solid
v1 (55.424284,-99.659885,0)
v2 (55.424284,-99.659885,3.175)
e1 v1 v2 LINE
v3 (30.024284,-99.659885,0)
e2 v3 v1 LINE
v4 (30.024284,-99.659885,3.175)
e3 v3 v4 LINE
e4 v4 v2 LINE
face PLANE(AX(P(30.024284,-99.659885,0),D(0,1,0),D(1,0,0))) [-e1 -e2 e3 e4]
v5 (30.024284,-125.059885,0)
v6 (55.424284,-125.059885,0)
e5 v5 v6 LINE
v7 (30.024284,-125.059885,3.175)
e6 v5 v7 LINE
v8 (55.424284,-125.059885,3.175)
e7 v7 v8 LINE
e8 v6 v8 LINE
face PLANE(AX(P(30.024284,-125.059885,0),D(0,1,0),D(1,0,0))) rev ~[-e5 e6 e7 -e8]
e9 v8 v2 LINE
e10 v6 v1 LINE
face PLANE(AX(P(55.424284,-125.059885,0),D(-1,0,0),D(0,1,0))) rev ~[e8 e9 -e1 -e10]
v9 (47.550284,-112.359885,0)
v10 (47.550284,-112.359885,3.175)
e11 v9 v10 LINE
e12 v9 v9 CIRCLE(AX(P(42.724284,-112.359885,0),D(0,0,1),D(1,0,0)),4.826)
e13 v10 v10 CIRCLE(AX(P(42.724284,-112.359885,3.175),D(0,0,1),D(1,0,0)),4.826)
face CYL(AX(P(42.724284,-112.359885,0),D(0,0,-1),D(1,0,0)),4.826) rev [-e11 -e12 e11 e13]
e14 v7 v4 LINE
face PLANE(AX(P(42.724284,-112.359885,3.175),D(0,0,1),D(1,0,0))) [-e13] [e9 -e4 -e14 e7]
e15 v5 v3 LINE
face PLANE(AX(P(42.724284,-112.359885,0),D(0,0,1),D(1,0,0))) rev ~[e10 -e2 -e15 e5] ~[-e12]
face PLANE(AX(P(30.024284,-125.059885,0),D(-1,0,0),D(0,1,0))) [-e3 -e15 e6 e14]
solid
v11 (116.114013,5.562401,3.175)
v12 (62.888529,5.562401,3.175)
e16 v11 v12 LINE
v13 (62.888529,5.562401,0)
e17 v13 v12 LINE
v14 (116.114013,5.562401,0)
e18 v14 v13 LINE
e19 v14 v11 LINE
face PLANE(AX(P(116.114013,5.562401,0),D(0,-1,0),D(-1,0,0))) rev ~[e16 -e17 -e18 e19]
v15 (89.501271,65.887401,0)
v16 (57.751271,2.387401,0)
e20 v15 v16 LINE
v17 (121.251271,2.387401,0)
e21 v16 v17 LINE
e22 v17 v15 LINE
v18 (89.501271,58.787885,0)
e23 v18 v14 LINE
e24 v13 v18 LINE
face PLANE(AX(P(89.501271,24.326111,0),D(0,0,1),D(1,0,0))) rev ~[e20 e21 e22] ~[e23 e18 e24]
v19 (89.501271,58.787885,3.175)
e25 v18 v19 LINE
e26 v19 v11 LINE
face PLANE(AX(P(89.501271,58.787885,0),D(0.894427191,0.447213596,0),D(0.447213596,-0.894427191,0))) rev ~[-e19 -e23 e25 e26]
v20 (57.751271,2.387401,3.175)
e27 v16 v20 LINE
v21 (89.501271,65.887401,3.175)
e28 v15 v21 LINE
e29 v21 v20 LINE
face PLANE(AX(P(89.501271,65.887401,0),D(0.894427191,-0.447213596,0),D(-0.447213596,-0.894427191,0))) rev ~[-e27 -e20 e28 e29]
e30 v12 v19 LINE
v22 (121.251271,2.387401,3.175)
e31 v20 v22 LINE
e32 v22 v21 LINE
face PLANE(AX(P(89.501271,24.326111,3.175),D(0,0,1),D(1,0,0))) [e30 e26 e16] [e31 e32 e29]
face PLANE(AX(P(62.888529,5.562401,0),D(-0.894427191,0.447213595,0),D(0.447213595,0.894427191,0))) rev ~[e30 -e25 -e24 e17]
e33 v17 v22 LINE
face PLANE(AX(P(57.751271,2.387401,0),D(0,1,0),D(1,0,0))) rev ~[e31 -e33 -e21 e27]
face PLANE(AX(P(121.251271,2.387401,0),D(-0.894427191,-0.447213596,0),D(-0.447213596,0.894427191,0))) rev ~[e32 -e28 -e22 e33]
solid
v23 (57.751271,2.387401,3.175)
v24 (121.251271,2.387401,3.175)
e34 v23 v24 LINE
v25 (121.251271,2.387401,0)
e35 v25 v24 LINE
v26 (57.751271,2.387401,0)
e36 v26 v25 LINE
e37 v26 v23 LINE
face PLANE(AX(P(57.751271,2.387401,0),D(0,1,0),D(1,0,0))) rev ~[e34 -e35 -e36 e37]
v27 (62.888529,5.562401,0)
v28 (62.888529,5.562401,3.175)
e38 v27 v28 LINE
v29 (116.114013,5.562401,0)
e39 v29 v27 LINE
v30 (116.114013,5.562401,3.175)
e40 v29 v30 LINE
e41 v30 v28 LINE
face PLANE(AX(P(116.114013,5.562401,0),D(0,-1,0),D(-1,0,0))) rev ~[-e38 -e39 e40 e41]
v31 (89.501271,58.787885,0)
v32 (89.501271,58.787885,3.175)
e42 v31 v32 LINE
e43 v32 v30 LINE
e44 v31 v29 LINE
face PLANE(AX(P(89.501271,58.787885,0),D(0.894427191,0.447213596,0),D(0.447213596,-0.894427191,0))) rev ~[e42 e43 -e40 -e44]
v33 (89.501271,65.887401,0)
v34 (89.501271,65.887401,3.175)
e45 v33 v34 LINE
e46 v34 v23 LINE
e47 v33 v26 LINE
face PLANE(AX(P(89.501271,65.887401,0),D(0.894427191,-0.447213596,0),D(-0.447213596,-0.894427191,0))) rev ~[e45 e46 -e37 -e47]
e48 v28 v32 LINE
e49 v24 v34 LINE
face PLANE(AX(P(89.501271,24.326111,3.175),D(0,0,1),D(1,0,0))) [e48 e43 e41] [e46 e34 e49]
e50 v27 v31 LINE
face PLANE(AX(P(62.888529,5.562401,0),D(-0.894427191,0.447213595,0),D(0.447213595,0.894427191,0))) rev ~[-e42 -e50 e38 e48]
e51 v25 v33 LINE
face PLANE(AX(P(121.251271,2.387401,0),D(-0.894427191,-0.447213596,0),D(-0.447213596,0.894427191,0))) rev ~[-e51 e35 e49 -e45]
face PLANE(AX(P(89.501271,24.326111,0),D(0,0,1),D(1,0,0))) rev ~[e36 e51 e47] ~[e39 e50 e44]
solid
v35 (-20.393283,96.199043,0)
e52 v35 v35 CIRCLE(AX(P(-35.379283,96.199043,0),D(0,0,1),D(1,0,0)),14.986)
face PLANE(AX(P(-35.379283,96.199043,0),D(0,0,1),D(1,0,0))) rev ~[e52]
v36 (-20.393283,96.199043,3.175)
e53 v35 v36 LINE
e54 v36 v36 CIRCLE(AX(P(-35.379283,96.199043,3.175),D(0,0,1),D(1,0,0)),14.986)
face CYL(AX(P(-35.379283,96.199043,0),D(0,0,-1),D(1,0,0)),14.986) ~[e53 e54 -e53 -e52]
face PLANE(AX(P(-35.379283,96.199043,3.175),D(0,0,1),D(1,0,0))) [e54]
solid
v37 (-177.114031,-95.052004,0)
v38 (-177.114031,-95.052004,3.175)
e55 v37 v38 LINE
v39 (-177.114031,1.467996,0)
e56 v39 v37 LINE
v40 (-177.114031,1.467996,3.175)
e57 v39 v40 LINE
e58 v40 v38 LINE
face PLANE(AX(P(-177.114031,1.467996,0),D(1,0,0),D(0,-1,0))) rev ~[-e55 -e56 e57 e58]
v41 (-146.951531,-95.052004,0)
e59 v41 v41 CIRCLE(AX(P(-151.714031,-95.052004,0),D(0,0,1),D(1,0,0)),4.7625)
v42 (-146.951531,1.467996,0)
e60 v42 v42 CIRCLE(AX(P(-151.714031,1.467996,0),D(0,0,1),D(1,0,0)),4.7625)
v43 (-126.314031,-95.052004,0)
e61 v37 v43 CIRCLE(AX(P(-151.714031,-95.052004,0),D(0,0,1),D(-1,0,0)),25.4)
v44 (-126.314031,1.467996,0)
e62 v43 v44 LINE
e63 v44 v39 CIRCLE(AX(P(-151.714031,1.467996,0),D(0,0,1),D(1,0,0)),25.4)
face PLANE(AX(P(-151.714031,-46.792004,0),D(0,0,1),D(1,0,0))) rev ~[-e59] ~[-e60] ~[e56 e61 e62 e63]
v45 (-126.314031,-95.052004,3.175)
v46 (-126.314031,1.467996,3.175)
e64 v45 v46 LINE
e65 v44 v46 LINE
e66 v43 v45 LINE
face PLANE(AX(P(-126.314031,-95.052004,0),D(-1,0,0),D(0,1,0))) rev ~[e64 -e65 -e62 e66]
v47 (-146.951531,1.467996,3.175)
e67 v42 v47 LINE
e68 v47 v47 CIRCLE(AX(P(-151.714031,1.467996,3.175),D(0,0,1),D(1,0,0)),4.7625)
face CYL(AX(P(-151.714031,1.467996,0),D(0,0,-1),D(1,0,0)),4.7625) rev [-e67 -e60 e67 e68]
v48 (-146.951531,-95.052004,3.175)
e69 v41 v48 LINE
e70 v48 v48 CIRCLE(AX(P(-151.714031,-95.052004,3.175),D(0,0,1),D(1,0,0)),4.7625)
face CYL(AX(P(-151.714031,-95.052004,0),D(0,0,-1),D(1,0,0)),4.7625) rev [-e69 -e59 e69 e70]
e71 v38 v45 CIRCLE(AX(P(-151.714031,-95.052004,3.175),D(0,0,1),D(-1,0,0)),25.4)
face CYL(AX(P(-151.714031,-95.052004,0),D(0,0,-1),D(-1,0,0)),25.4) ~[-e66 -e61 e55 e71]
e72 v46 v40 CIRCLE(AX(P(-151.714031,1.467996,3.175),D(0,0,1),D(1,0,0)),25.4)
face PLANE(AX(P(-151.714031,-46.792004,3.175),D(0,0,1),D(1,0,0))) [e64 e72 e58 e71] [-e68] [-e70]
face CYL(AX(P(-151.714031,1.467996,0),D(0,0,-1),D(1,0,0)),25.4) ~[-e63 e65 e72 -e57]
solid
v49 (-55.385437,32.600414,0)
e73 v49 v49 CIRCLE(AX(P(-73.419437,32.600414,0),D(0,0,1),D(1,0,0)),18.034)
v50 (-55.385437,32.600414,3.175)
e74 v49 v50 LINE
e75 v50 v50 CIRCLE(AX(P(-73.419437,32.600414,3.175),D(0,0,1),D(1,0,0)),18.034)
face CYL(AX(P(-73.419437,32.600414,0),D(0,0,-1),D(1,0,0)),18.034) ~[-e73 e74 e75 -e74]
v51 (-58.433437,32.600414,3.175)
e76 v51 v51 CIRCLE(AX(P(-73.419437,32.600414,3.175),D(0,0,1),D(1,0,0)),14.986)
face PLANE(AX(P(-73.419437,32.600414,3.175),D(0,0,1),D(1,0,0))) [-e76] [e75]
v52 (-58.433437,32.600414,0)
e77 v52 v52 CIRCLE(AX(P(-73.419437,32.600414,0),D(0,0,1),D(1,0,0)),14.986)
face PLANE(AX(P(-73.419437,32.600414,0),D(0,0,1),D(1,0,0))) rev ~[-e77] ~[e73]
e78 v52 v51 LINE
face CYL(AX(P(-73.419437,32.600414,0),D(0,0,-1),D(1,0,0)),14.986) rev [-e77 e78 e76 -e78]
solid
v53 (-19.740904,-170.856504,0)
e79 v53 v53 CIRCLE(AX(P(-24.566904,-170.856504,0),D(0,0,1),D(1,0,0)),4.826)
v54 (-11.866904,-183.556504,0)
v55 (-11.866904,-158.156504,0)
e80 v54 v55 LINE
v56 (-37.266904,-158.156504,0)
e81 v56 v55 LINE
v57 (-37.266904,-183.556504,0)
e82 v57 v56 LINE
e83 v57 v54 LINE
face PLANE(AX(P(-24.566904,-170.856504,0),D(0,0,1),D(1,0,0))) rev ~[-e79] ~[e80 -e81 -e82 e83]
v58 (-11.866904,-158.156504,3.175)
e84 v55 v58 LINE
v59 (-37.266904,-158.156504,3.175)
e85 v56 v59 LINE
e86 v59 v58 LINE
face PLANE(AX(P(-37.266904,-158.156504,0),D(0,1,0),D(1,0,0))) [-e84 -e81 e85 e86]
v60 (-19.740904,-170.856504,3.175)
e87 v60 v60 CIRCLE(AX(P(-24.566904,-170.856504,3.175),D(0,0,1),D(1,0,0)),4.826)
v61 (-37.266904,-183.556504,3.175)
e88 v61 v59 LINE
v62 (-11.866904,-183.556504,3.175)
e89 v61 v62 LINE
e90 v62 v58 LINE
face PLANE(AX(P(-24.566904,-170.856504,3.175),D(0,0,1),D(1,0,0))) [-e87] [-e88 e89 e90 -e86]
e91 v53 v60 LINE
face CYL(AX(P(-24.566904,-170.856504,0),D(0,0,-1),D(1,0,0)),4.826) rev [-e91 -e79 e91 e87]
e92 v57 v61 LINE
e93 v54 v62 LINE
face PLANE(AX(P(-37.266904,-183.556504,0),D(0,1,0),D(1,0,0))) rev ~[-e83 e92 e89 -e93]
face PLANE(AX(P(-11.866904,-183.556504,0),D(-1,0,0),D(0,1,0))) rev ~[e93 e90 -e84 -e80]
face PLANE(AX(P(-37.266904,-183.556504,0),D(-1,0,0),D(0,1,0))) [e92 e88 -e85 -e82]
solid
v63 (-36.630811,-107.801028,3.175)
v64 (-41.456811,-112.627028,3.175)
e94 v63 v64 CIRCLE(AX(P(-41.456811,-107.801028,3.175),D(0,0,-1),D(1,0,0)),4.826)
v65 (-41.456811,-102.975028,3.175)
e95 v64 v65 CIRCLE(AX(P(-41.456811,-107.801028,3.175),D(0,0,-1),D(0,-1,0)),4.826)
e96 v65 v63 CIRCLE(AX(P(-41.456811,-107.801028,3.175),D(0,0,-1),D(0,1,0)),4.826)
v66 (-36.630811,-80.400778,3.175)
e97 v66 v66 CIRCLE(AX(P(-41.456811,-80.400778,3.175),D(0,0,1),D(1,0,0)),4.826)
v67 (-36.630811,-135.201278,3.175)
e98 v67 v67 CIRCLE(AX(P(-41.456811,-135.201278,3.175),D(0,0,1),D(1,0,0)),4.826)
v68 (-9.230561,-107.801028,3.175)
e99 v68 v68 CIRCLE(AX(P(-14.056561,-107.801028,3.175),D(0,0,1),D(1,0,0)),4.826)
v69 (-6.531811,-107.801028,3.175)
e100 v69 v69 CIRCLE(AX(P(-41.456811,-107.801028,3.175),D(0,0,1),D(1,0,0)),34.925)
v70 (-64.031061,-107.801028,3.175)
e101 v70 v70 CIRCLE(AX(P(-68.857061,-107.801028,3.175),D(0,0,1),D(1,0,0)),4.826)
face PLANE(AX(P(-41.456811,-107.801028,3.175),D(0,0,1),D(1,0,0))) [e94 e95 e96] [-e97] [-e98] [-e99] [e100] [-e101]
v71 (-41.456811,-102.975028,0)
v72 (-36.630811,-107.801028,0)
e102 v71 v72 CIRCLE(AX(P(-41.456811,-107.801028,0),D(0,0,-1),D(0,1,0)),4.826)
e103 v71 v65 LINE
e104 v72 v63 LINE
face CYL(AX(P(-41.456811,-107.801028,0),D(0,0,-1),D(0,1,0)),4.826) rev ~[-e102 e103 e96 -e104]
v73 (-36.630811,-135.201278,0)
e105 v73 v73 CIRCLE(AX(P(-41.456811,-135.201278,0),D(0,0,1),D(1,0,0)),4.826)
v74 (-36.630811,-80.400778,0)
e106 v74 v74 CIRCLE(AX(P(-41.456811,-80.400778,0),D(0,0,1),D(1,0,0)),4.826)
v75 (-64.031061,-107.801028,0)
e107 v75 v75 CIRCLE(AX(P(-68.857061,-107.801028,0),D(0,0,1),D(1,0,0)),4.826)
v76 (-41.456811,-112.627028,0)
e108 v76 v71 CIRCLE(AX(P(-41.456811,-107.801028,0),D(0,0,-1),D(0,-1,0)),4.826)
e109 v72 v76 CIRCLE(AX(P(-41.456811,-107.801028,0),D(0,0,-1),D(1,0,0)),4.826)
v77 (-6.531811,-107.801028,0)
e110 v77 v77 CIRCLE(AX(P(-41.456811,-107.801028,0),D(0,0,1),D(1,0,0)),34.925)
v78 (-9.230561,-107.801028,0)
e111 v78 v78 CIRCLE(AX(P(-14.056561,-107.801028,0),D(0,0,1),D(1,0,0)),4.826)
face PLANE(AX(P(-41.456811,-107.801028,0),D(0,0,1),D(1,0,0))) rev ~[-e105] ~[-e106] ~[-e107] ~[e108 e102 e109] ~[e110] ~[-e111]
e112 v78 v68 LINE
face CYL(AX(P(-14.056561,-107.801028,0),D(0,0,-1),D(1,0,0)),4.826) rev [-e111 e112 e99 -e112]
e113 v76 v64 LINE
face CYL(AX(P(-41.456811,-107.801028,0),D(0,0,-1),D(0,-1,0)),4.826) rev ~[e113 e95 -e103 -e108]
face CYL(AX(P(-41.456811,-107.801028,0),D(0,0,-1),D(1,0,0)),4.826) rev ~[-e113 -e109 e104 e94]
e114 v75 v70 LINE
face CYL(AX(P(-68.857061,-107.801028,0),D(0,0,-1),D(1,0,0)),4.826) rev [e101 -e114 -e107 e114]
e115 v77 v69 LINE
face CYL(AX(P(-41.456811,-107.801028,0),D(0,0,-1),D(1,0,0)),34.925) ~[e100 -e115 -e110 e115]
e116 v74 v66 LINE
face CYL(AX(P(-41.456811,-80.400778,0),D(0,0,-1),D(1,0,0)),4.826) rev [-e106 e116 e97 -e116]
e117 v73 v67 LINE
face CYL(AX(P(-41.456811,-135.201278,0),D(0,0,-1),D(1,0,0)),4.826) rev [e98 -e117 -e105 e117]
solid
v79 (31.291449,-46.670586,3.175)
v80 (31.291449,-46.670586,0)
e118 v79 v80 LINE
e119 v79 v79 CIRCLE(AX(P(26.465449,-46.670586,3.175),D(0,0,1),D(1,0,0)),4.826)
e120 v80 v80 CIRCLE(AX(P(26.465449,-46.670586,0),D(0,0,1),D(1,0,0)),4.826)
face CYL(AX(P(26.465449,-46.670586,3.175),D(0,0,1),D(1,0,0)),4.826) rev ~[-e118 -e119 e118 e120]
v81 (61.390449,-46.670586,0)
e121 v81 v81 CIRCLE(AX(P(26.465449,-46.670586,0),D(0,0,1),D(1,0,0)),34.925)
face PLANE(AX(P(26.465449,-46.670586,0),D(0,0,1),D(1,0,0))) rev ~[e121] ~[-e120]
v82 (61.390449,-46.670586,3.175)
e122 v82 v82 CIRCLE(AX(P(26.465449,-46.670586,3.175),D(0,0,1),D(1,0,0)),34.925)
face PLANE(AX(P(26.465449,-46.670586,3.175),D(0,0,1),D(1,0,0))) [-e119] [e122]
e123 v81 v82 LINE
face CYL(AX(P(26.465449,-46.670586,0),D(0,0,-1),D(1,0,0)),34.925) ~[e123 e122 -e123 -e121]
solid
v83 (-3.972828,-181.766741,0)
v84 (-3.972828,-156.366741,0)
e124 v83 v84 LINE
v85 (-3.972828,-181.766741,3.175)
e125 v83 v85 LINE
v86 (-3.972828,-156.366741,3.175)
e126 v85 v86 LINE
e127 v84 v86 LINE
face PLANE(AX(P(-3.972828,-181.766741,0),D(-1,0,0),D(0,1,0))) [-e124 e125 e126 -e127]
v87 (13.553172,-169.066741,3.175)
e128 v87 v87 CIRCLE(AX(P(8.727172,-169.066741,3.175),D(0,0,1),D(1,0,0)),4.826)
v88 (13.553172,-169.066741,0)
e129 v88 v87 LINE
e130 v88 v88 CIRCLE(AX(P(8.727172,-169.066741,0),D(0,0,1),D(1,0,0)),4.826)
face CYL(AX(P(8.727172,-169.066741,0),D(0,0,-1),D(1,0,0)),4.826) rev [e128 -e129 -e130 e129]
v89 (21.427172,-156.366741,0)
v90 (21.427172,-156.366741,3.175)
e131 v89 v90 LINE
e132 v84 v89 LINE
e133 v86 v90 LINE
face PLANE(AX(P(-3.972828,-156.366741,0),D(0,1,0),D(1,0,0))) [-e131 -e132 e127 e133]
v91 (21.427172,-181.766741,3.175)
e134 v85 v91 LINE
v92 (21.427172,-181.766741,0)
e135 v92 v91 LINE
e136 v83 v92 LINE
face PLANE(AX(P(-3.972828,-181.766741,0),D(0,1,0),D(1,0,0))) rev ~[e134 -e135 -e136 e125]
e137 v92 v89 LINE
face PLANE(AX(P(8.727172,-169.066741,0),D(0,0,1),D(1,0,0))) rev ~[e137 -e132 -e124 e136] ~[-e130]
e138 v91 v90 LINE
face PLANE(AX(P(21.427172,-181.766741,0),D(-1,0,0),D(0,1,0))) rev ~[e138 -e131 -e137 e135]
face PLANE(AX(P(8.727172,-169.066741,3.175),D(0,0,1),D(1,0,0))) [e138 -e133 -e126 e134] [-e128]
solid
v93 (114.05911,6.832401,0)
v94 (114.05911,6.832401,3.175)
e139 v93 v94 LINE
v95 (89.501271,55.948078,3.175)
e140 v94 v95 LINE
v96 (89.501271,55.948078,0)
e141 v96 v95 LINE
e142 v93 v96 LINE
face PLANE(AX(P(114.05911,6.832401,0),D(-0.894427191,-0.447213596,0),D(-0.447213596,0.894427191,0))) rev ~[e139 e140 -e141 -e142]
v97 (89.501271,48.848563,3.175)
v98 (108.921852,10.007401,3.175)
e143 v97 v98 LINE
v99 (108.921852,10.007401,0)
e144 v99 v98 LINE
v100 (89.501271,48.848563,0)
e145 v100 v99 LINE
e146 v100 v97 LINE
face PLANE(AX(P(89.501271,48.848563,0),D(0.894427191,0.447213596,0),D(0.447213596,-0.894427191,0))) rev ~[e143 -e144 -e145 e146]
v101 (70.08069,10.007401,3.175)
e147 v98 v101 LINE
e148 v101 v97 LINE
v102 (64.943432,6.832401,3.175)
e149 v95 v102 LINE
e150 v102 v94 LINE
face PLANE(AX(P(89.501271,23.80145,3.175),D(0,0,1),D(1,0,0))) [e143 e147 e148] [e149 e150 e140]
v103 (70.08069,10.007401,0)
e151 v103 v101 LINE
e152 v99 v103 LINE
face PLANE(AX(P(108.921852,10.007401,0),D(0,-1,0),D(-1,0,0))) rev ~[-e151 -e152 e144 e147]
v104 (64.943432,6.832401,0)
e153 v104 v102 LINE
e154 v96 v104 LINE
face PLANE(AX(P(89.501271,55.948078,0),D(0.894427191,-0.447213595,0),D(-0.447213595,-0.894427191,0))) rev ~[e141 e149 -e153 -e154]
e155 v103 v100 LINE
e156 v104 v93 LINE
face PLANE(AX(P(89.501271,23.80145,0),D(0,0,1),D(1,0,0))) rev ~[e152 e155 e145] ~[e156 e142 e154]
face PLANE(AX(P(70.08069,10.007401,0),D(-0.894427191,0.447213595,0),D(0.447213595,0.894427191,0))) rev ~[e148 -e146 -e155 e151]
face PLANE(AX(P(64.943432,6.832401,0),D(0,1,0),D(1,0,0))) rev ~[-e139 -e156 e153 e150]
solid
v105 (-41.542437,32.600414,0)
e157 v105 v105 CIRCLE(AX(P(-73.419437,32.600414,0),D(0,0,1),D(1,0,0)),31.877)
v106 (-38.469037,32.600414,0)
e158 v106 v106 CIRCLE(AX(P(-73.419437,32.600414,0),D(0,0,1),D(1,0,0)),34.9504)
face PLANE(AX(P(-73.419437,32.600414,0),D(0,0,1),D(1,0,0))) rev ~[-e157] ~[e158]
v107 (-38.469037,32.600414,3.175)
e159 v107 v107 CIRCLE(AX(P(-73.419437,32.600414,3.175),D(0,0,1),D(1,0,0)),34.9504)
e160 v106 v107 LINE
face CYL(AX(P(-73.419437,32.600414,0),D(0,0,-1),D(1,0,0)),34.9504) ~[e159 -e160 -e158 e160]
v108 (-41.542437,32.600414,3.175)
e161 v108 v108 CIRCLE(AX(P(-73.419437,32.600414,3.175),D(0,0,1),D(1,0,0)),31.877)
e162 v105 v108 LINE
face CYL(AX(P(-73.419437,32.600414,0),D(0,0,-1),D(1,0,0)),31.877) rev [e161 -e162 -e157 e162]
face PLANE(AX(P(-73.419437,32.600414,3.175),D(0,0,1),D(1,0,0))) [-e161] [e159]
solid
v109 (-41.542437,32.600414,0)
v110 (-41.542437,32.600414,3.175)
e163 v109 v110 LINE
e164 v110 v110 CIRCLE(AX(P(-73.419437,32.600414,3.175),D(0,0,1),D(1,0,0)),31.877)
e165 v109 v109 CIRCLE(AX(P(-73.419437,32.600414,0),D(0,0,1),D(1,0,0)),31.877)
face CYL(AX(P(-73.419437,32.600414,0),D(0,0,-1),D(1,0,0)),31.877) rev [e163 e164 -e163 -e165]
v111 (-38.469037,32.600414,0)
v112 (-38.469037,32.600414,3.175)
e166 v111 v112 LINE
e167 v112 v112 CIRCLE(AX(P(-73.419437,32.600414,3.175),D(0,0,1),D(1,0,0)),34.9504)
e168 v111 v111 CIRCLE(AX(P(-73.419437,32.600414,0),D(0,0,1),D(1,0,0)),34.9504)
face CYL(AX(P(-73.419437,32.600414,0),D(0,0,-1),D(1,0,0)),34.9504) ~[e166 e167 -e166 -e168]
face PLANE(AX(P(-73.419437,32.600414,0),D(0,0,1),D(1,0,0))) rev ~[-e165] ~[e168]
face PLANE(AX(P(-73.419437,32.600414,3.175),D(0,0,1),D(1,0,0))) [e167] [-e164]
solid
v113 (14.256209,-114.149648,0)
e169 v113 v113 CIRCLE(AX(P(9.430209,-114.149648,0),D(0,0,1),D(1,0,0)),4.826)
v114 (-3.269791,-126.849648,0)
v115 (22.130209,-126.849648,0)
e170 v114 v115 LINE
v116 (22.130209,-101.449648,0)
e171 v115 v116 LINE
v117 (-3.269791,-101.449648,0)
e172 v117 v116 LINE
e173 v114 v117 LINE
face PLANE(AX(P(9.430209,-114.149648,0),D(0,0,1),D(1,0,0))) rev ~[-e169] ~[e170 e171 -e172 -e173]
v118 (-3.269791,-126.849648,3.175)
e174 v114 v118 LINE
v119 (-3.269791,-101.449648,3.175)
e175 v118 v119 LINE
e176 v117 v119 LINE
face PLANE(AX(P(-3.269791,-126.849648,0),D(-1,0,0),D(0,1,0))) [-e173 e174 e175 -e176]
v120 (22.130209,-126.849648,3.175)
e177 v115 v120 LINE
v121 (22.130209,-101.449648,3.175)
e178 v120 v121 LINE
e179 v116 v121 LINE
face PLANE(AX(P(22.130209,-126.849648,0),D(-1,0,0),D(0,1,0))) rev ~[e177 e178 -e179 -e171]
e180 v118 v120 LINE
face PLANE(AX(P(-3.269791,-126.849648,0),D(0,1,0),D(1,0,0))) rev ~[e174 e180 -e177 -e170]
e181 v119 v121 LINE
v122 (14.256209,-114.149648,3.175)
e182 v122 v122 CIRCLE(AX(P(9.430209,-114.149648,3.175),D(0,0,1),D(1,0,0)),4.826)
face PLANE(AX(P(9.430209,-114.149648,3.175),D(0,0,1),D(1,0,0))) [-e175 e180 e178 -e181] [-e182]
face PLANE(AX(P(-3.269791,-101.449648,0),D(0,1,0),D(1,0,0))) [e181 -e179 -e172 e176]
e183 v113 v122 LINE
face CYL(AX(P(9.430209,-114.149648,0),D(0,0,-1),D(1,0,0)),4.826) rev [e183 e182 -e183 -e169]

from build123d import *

# Parameters (mm, degrees)
F1_R      = 34.925
F1_R_2    = 4.826
F2_DEPTH  = 3.175
F3_R      = 34.925
F4_DEPTH  = 3.175
F5_R      = 4.826
F6_DEPTH  = 25.4
F7_W      = 25.4
F7_H      = 25.4
F7_R      = 4.826
F8_DEPTH  = 3.175
F0_R      = 18.034
F0_R_2    = 14.986
F9_DEPTH  = 3.175
F0_R_3    = 34.9504
F0_R_4    = 31.877
F10_R     = 4.7625
F11_DEPTH = 3.175
F12_DEPTH = 3.175
F13_DEPTH = 3.175


# Not quite as in the source:
# - a feature names something its author has since deleted; it is built from what else it names


with BuildPart() as f2:
    # F1 (on Top) → F2 (new body)
    with BuildSketch(Plane.XY):
        with Locations((-41.45681113, -107.801027596)):
            Circle(F1_R)
        with Locations((-41.45681113, -135.201277596)):
            Circle(F1_R_2, mode=Mode.SUBTRACT)
        with Locations((-68.85706113, -107.801027596)):
            Circle(F1_R_2, mode=Mode.SUBTRACT)
        with BuildLine():
            ThreePointArc((-41.45681113, -102.975027596), (-38.044313804, -104.38853027), (-36.63081113, -107.801027596))
            ThreePointArc((-36.63081113, -107.801027596), (-38.044313804, -111.213524922), (-41.45681113, -112.627027596))
            ThreePointArc((-41.45681113, -112.627027596), (-46.28281113, -107.801027596), (-41.45681113, -102.975027596))
        make_face(mode=Mode.SUBTRACT)
        with Locations((-14.05656113, -107.801027596)):
            Circle(F1_R_2, mode=Mode.SUBTRACT)
        with Locations((-41.45681113, -80.400777596)):
            Circle(F1_R_2, mode=Mode.SUBTRACT)
    extrude(amount=F2_DEPTH)


with BuildPart() as f4:
    # F3 (on Top) → F4 (new body)
    with BuildSketch(Plane.XY):
        with Locations((26.4654487837, -46.6705858707)):
            Circle(F3_R)
    extrude(amount=F4_DEPTH)

    # F5 (on face) → F6 (cut)
    with BuildSketch(Plane.XY.offset(3.175)):
        with Locations((26.4654487837, -46.6705858707)):
            Circle(F5_R)
    extrude(amount=-F6_DEPTH, mode=Mode.SUBTRACT)


with BuildPart() as f8:
    # F7 (on Top) → F8 (new body)
    with BuildSketch(Plane.XY):
        with Locations((9.4302088464, -114.1496481273)):
            Rectangle(F7_W, F7_H)
        with Locations((9.4302088464, -114.1496481273)):
            Circle(F7_R, mode=Mode.SUBTRACT)
    extrude(amount=F8_DEPTH)

    # F7 (on Top) → F12 (join)
    with BuildSketch(Plane.XY):
        with Locations((9.4302088464, -114.1496481273)):
            Rectangle(F7_W, F7_H)
        with Locations((9.4302088464, -114.1496481273)):
            Circle(F7_R, mode=Mode.SUBTRACT)
    extrude(amount=F12_DEPTH)


with BuildPart() as f9:
    # F0 (on Top) → F9 (new body)
    with BuildSketch(Plane.XY):
        with Locations((-73.4194368124, 32.6004140079)):
            Circle(F0_R)
        with Locations((-73.4194368124, 32.6004140079)):
            Circle(F0_R_2, mode=Mode.SUBTRACT)
    extrude(amount=F9_DEPTH)


with BuildPart() as f9b:
    # F0 (on Top) → F9, piece 2 (new body)
    with BuildSketch(Plane.XY):
        with Locations((-73.4194368124, 32.6004140079)):
            Circle(F0_R_3)
        with Locations((-73.4194368124, 32.6004140079)):
            Circle(F0_R_4, mode=Mode.SUBTRACT)
    extrude(amount=F9_DEPTH)


with BuildPart() as f9c:
    # F0 (on Top) → F9, piece 3 (new body)
    with BuildSketch(Plane.XY):
        Polygon((89.5012710243, 65.8874005459), (57.7512710243, 2.3874005459), (89.5012710243, 2.3874005459), (121.2512710243, 2.3874005459), align=None)
        Polygon((116.1140131101, 5.5624005459), (89.5012710243, 5.5624005459), (62.8885289386, 5.5624005459), (89.5012710243, 58.7878847174), align=None, mode=Mode.SUBTRACT)
    extrude(amount=F9_DEPTH)


with BuildPart() as f9d:
    # F0 (on Top) → F9, piece 4 (new body)
    with BuildSketch(Plane.XY):
        Polygon((89.5012710243, 55.948078386), (64.9434321043, 6.8324005459), (89.5012710243, 6.8324005459), (114.0591099444, 6.8324005459), align=None)
        Polygon((108.9218520301, 10.0074005459), (89.5012710243, 10.0074005459), (70.0806900186, 10.0074005459), (89.5012710243, 48.8485625574), align=None, mode=Mode.SUBTRACT)
    extrude(amount=F9_DEPTH)


with BuildPart() as f11:
    # F10 (on Top) → F11 (new body)
    with BuildSketch(Plane.XY):
        with BuildLine():
            Line((-126.3140311956, -95.0520038605), (-126.3140311956, 1.4679961395))
            ThreePointArc((-126.3140311956, 1.4679961395), (-151.7140311956, 26.8679961395), (-177.1140311956, 1.4679961395))
            Line((-177.1140311956, 1.4679961395), (-177.1140311956, -95.0520038605))
            ThreePointArc((-177.1140311956, -95.0520038605), (-151.7140311956, -120.4520038605), (-126.3140311956, -95.0520038605))
        make_face()
        with Locations((-151.7140311956, -95.0520038605)):
            Circle(F10_R, mode=Mode.SUBTRACT)
        with Locations((-151.7140311956, 1.4679961395)):
            Circle(F10_R, mode=Mode.SUBTRACT)
    extrude(amount=F11_DEPTH)


with BuildPart() as f12:
    # F7 (on Top) → F12, piece 2 (new body)
    with BuildSketch(Plane.XY):
        with Locations((42.7242840971, -112.3598849141)):
            Rectangle(F7_W, F7_H)
        with Locations((42.7242840971, -112.3598849141)):
            Circle(F7_R, mode=Mode.SUBTRACT)
    extrude(amount=F12_DEPTH)


with BuildPart() as f12b:
    # F7 (on Top) → F12, piece 3 (new body)
    with BuildSketch(Plane.XY):
        with Locations((-24.5669036167, -170.8565043216)):
            Rectangle(F7_W, F7_H)
        with Locations((-24.5669036167, -170.8565043216)):
            Circle(F7_R, mode=Mode.SUBTRACT)
    extrude(amount=F12_DEPTH)


with BuildPart() as f12c:
    # F7 (on Top) → F12, piece 4 (new body)
    with BuildSketch(Plane.XY):
        with Locations((8.7271716339, -169.0667411084)):
            Rectangle(F7_W, F7_H)
        with Locations((8.7271716339, -169.0667411084)):
            Circle(F7_R, mode=Mode.SUBTRACT)
    extrude(amount=F12_DEPTH)


with BuildPart() as f13:
    # F0 (on Top) → F13 (new body)
    with BuildSketch(Plane.XY):
        Polygon((89.5012710243, 65.8874005459), (57.7512710243, 2.3874005459), (89.5012710243, 2.3874005459), (121.2512710243, 2.3874005459), align=None)
        Polygon((116.1140131101, 5.5624005459), (89.5012710243, 5.5624005459), (62.8885289386, 5.5624005459), (89.5012710243, 58.7878847174), align=None, mode=Mode.SUBTRACT)
    extrude(amount=F13_DEPTH)


with BuildPart() as f13b:
    # F0 (on Top) → F13, piece 2 (new body)
    with BuildSketch(Plane.XY):
        with Locations((-73.4194368124, 32.6004140079)):
            Circle(F0_R_3)
        with Locations((-73.4194368124, 32.6004140079)):
            Circle(F0_R_4, mode=Mode.SUBTRACT)
    extrude(amount=F13_DEPTH)


with BuildPart() as f13c:
    # F0 (on Top) → F13, piece 3 (new body)
    with BuildSketch(Plane.XY):
        with Locations((-35.3792831302, 96.1990430951)):
            Circle(F0_R_2)
    extrude(amount=F13_DEPTH)


solid = Compound([f2.part, f4.part, f8.part, f9.part, f9b.part, f9c.part, f9d.part, f11.part, f12.part, f12b.part, f12c.part, f13.part, f13b.part, f13c.part])
